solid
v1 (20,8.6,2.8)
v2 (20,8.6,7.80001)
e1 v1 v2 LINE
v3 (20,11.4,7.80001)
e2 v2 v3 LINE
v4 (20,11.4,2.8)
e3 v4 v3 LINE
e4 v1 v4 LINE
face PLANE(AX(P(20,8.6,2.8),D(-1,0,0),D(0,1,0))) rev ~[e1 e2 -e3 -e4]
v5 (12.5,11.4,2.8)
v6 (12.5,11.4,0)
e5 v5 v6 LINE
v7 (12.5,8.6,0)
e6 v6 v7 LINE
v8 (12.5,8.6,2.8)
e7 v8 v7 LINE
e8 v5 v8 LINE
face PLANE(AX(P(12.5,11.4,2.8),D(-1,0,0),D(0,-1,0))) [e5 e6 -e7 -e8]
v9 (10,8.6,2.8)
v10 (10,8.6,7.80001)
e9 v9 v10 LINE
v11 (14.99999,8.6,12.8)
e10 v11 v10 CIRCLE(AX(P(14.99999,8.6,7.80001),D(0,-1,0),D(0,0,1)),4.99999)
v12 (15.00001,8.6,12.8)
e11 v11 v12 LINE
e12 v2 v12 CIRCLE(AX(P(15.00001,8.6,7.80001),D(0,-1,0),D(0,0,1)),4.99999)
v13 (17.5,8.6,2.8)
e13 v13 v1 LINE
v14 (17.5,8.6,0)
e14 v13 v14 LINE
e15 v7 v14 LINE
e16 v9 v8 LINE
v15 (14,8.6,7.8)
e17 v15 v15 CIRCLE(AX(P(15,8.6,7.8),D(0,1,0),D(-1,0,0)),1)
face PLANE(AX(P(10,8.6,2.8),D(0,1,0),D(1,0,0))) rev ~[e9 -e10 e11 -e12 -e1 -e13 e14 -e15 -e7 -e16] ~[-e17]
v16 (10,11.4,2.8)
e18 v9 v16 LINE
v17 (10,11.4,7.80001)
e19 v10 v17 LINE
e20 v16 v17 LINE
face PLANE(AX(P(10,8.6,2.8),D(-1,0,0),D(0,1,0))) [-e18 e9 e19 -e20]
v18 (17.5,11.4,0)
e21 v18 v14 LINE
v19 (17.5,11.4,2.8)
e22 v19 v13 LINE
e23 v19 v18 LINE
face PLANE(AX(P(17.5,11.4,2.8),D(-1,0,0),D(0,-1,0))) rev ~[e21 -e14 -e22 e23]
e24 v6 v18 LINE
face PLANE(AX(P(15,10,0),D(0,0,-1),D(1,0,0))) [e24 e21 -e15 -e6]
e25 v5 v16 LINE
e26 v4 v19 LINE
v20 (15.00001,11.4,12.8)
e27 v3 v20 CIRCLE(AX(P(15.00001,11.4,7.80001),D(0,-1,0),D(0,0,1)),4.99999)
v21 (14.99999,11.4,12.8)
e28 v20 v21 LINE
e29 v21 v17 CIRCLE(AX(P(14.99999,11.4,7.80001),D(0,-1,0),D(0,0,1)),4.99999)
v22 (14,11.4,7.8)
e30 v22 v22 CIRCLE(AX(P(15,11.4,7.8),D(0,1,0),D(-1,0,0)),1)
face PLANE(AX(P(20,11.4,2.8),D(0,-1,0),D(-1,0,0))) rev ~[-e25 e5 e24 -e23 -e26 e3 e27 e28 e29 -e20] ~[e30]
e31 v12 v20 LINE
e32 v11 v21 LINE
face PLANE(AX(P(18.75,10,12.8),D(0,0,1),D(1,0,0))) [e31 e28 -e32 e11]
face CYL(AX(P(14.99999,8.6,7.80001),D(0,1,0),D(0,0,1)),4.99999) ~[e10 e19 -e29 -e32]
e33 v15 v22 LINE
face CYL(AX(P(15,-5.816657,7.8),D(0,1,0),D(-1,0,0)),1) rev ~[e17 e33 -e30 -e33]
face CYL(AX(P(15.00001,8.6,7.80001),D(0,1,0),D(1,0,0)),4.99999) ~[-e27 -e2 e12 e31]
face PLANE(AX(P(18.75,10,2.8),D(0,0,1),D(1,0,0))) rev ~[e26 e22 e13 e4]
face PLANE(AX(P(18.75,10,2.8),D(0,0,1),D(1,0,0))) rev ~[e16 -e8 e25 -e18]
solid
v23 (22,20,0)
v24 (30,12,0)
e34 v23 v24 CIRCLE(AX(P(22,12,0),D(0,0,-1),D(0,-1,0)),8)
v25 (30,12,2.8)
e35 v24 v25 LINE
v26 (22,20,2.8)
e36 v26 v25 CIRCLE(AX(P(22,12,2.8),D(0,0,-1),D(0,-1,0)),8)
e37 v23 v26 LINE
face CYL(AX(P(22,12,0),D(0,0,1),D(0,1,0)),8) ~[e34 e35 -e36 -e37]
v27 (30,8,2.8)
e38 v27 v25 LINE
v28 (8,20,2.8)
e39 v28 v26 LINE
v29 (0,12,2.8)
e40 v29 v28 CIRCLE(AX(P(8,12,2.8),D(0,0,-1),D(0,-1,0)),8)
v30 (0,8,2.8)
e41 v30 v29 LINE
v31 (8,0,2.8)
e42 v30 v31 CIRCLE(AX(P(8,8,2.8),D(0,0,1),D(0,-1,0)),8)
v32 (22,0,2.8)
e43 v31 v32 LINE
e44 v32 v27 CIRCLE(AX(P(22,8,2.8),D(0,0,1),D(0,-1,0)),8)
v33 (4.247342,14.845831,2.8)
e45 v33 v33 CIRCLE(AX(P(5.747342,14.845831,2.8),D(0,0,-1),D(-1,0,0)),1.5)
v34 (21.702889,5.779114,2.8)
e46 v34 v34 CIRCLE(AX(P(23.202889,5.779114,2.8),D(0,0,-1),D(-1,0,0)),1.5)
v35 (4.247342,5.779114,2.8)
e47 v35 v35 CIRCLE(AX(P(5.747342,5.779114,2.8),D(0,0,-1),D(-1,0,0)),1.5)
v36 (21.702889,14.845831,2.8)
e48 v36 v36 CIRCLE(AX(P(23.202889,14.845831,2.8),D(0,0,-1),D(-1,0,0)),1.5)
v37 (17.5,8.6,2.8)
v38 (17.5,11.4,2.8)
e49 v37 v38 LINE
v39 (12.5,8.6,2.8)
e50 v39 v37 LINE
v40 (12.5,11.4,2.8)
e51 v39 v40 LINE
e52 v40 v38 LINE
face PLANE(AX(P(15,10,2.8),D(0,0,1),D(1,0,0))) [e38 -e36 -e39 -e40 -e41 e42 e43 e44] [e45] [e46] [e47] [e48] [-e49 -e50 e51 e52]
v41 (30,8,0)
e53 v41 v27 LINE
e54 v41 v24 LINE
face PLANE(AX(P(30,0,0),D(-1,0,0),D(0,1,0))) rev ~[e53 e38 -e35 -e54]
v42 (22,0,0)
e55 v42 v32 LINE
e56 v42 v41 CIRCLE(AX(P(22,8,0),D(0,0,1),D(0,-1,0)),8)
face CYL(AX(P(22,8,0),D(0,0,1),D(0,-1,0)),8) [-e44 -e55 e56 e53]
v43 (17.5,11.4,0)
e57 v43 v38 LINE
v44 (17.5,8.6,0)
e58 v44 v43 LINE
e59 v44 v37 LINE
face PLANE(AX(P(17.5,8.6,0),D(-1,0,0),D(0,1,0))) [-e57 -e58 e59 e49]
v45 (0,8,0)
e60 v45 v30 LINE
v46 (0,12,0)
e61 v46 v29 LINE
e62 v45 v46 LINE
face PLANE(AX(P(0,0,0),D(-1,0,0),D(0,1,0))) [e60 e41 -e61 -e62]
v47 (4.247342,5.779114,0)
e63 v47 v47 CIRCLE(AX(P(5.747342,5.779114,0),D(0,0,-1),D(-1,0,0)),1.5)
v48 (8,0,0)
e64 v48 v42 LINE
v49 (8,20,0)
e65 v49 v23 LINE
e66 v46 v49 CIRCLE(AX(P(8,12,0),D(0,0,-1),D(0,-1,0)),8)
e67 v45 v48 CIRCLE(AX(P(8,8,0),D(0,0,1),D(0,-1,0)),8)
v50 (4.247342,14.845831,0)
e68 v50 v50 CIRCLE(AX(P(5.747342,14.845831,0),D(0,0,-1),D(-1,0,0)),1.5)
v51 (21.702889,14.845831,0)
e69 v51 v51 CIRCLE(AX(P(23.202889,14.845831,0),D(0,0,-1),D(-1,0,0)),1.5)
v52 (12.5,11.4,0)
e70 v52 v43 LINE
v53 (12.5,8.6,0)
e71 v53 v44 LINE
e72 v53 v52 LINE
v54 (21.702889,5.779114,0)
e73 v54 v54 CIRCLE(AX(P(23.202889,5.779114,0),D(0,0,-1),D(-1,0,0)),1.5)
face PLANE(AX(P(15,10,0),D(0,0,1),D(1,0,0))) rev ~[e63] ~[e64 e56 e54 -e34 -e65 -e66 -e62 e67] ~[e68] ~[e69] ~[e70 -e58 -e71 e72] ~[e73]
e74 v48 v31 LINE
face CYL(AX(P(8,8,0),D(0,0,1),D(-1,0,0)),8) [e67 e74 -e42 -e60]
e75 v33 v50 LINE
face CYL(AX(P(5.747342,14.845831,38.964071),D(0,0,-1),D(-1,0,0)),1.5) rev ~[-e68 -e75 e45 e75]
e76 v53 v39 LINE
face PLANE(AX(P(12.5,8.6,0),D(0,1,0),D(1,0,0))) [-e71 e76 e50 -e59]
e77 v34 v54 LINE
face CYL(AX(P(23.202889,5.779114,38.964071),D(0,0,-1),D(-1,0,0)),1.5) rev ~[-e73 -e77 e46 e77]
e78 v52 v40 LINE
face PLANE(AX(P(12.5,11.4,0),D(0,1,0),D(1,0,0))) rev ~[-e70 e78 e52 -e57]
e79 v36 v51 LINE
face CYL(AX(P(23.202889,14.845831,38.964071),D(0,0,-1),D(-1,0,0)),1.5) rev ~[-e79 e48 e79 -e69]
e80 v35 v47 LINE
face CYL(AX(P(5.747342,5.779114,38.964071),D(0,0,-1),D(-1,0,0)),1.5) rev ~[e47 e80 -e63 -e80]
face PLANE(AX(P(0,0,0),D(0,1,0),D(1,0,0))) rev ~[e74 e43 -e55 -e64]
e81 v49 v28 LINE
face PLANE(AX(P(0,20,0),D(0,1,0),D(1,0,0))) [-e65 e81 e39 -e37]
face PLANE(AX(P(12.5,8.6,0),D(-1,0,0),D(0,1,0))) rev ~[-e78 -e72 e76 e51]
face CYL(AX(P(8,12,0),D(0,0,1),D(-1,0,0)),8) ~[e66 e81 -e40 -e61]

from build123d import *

# Parameters (mm, degrees)
F0_W     = 30
F0_H     = 20
F0_W_2   = 5
F0_H_2   = 2.8
F1_DEPTH = 2.8
F2_W     = 2.5
F2_H     = 2.8
F2_W_2   = 5
F3_DEPTH = 10
F5_D     = 2
F6_R     = 4.99999
F7_W     = 5
F7_H     = 2.8
F8_DEPTH = 2.8
F9_R     = 8
F11_D    = 3


# Not quite as in the source:
# - a fillet or chamfer is up to 0.001 mm smaller than in the source, because OpenCascade refuses the exact size


with BuildPart() as f1:
    # F0 (on Top) → F1 (new body)
    with BuildSketch(Plane.XY):
        with Locations((15, 10)):
            Rectangle(F0_W, F0_H)
        with Locations((15, 10)):
            Rectangle(F0_W_2, F0_H_2, mode=Mode.SUBTRACT)
    extrude(amount=F1_DEPTH)

    # F9
    f9_edges = [f1.edges().sort_by_distance(p)[0] for p in [
        (30, 20, 1.4),
        (0, 20, 1.4),
        (30, 0, 1.4),
        (0, 0, 1.4),
    ]]
    fillet(f9_edges, radius=F9_R)

    # F11 (through all)
    with Locations(Plane.XY.offset(2.8)):
        with Locations((5.7473420165, 14.8458313197), (23.2028886676, 14.8458313197), (23.2028886676, 5.7791140862), (5.7473420165, 5.7791140862)):
            Hole(F11_D / 2)


with BuildPart() as f3:
    # F2 (on face) → F3 (new body)
    with BuildSketch(Plane.XY.offset(2.8)):
        with Locations((18.75, 10)):
            Rectangle(F2_W, F2_H)
        with Locations((15, 10)):
            Rectangle(F2_W_2, F2_H)
        with Locations((11.25, 10)):
            Rectangle(F2_W, F2_H)
    extrude(amount=F3_DEPTH)

    # F5 (through all)
    with Locations(Plane.XZ.offset(-8.6)):
        with Locations((15, 7.8)):
            Hole(F5_D / 2)

    # F6 (radius 5 in the source; OpenCascade refuses exactly that, so slightly less here)
    f6_edges = [f3.edges().sort_by_distance(p)[0] for p in [
        (10, 10, 12.8),
        (20, 10, 12.8),
    ]]
    fillet(f6_edges, radius=F6_R)

    # F7 (on face) → F8 (join)
    with BuildSketch(Plane(origin=(0, 0, 2.8), x_dir=(1, 0, 0), z_dir=(0, 0, -1))):
        with Locations((15, -10)):
            Rectangle(F7_W, F7_H)
    extrude(amount=F8_DEPTH)


solid = Compound([f1.part, f3.part])
